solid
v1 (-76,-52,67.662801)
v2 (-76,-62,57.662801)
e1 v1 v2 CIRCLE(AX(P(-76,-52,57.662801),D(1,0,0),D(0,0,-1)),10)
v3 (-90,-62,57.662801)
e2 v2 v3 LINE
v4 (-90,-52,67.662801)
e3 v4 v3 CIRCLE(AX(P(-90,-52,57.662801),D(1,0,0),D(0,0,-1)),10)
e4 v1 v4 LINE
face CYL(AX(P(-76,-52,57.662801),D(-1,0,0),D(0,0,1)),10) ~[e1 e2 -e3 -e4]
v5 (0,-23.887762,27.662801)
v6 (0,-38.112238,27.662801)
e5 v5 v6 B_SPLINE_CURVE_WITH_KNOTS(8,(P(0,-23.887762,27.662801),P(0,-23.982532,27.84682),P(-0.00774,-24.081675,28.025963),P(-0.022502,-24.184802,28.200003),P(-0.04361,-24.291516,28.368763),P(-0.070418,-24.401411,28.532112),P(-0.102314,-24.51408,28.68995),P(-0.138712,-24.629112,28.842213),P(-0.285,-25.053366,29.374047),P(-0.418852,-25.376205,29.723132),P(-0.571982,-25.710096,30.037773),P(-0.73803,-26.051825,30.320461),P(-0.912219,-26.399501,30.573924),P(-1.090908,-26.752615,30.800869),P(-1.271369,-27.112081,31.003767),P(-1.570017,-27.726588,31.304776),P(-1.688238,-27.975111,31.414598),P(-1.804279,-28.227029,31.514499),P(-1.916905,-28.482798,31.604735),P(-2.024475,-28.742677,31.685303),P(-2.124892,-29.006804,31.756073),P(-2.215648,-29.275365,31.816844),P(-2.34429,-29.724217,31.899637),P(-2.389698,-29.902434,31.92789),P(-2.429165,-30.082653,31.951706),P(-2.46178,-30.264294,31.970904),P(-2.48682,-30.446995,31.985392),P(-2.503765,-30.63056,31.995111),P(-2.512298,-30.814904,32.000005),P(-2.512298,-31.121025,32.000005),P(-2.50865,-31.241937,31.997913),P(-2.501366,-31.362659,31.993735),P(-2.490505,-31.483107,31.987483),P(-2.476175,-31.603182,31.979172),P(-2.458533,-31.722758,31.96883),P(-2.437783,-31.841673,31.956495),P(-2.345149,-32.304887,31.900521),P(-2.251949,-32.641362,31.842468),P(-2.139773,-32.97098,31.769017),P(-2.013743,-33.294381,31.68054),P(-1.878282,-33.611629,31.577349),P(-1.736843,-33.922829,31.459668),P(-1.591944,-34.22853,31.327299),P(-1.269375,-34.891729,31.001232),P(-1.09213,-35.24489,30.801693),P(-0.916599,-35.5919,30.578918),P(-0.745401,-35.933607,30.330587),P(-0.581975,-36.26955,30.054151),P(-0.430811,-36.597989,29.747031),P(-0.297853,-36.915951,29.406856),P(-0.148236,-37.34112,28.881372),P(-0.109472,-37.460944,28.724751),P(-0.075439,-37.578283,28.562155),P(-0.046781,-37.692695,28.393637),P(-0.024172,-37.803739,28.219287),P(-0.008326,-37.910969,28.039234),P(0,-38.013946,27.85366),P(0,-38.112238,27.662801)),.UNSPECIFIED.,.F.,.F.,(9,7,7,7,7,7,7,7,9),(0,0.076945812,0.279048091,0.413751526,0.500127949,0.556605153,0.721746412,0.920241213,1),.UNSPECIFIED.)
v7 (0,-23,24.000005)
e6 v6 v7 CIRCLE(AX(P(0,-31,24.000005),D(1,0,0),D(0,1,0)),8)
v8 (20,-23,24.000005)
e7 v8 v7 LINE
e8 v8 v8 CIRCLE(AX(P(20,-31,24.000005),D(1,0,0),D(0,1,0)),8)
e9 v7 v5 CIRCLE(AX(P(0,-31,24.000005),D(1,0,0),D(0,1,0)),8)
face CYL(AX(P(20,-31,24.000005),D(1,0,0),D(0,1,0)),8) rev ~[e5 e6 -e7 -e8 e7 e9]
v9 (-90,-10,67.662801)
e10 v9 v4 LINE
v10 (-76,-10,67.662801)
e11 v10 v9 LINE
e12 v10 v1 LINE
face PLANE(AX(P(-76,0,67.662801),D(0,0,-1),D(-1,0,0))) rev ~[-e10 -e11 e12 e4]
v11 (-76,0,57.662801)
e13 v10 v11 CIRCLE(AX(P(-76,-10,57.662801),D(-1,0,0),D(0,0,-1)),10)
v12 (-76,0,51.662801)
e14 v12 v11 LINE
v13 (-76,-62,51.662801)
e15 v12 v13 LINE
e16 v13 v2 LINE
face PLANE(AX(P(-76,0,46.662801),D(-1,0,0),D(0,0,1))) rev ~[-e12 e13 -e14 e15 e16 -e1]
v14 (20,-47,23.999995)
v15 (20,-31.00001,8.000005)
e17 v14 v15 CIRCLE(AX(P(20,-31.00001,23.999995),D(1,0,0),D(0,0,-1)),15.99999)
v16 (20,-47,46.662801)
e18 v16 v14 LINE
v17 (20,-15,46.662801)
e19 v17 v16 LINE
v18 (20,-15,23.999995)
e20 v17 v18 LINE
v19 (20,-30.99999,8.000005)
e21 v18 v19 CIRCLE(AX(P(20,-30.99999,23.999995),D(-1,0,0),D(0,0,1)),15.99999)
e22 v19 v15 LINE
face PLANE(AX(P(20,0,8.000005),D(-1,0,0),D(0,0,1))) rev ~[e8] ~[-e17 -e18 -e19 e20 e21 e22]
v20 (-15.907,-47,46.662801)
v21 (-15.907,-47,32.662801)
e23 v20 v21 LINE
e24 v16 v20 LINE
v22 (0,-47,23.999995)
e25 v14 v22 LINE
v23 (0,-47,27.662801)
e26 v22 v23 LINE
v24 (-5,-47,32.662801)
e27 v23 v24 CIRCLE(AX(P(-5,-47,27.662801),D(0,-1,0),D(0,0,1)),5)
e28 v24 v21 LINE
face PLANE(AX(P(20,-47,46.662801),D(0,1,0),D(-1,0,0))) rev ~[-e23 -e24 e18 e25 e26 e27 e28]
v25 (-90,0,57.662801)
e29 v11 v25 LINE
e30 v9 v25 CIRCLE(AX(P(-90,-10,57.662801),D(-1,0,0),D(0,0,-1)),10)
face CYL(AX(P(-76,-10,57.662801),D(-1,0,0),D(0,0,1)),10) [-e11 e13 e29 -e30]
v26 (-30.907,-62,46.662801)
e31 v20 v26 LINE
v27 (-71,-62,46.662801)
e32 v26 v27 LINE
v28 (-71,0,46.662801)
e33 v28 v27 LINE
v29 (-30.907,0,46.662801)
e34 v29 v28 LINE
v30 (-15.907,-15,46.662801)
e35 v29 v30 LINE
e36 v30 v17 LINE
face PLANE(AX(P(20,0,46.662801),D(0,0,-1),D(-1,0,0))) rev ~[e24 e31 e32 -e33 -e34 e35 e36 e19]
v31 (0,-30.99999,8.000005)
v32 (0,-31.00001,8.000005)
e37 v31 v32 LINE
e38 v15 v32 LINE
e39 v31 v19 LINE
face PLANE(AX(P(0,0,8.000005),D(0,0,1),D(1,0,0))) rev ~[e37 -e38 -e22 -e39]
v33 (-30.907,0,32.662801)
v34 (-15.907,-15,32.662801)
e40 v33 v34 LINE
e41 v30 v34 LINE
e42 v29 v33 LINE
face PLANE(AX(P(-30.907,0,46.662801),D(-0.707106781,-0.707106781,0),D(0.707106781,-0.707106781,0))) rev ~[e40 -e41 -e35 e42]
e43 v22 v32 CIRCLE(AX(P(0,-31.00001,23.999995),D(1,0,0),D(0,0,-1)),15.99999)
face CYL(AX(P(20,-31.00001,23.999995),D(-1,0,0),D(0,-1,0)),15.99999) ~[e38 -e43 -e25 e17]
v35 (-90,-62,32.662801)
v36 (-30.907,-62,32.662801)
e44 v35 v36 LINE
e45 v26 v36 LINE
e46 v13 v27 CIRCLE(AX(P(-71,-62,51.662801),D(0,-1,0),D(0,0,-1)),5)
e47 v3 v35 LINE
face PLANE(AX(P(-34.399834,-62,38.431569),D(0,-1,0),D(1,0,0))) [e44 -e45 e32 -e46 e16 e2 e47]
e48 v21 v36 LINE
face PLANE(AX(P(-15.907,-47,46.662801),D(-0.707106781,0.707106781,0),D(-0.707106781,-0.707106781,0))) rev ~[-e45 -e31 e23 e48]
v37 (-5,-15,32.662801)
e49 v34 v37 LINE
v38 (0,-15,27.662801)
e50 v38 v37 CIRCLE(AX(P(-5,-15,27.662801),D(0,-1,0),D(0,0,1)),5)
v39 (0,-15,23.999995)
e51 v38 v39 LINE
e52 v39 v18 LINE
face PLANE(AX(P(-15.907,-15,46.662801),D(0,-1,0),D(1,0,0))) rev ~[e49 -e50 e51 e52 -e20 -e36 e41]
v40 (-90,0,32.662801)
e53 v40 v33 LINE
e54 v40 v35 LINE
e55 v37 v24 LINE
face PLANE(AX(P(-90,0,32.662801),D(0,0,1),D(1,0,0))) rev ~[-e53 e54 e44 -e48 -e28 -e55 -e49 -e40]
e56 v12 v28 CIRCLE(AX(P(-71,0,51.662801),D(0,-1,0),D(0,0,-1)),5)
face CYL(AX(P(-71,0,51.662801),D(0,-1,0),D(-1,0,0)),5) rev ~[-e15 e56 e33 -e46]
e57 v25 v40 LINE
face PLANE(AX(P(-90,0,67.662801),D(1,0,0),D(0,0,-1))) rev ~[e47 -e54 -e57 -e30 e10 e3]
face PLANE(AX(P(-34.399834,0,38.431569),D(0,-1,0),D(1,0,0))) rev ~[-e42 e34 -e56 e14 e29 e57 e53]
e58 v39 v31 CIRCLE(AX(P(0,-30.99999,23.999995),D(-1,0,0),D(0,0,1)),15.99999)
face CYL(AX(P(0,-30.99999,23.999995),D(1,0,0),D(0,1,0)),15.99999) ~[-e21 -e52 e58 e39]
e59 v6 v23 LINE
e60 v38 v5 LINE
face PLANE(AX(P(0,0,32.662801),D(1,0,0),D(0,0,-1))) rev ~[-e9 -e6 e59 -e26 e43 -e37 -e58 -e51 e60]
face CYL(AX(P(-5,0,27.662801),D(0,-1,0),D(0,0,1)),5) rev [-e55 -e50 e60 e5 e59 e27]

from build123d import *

# Parameters (mm, degrees)
F1_DEPTH = 62
F2_R     = 10
F3_R     = 5
F4_R     = 5
F6_DEPTH = 666
F7_R     = 15.99999
F8_R     = 8
F9_DEPTH = 25


# Not quite as in the source:
# - a fillet or chamfer is up to 0.001 mm smaller than in the source, because OpenCascade refuses the exact size


with BuildPart() as f1:
    # F0 (on Front) → F1 (new body)
    with BuildSketch(Plane.XZ):
        Polygon((-76, 67.66280128), (-90, 67.66280128), (-90, 32.66280128), (0, 32.66280128), (0, 8.0000054104), (20, 8.0000054104), (20, 46.66280128), (-76, 46.66280128), align=None)
    extrude(amount=F1_DEPTH)

    # F2
    f2_edges = [f1.edges().sort_by_distance(p)[0] for p in [
        (-83, -62, 67.662801),
        (-83, 0, 67.662801),
    ]]
    fillet(f2_edges, radius=F2_R)

    # F3
    f3_edges = [f1.edges().sort_by_distance(p)[0] for p in [
        (-76, -31, 46.662801),
    ]]
    fillet(f3_edges, radius=F3_R)

    # F4
    f4_edges = [f1.edges().sort_by_distance(p)[0] for p in [
        (0, -31, 32.662801),
    ]]
    fillet(f4_edges, radius=F4_R)

    # F5 (on face) → F6 (cut)
    with BuildSketch(Plane.XY.offset(46.66280128)):
        Polygon((20, -62), (20, -47), (-15.907, -47), (-30.907, -62), align=None)
        Polygon((-15.907, -15), (20, -15), (20, 0), (-30.907, 0), align=None)
    extrude(amount=-F6_DEPTH, mode=Mode.SUBTRACT)

    # F7 (radius 16 in the source; OpenCascade refuses exactly that, so slightly less here)
    f7_edges = [f1.edges().sort_by_distance(p)[0] for p in [
        (10, -47, 8.000005),
        (10, -15, 8.000005),
    ]]
    fillet(f7_edges, radius=F7_R)

    # F8 (on face) → F9 (cut)
    with BuildSketch(Plane.YZ.offset(20)):
        with Locations((-31, 24.0000054104)):
            Circle(F8_R)
    extrude(amount=-F9_DEPTH, mode=Mode.SUBTRACT)


solid = f1.part
